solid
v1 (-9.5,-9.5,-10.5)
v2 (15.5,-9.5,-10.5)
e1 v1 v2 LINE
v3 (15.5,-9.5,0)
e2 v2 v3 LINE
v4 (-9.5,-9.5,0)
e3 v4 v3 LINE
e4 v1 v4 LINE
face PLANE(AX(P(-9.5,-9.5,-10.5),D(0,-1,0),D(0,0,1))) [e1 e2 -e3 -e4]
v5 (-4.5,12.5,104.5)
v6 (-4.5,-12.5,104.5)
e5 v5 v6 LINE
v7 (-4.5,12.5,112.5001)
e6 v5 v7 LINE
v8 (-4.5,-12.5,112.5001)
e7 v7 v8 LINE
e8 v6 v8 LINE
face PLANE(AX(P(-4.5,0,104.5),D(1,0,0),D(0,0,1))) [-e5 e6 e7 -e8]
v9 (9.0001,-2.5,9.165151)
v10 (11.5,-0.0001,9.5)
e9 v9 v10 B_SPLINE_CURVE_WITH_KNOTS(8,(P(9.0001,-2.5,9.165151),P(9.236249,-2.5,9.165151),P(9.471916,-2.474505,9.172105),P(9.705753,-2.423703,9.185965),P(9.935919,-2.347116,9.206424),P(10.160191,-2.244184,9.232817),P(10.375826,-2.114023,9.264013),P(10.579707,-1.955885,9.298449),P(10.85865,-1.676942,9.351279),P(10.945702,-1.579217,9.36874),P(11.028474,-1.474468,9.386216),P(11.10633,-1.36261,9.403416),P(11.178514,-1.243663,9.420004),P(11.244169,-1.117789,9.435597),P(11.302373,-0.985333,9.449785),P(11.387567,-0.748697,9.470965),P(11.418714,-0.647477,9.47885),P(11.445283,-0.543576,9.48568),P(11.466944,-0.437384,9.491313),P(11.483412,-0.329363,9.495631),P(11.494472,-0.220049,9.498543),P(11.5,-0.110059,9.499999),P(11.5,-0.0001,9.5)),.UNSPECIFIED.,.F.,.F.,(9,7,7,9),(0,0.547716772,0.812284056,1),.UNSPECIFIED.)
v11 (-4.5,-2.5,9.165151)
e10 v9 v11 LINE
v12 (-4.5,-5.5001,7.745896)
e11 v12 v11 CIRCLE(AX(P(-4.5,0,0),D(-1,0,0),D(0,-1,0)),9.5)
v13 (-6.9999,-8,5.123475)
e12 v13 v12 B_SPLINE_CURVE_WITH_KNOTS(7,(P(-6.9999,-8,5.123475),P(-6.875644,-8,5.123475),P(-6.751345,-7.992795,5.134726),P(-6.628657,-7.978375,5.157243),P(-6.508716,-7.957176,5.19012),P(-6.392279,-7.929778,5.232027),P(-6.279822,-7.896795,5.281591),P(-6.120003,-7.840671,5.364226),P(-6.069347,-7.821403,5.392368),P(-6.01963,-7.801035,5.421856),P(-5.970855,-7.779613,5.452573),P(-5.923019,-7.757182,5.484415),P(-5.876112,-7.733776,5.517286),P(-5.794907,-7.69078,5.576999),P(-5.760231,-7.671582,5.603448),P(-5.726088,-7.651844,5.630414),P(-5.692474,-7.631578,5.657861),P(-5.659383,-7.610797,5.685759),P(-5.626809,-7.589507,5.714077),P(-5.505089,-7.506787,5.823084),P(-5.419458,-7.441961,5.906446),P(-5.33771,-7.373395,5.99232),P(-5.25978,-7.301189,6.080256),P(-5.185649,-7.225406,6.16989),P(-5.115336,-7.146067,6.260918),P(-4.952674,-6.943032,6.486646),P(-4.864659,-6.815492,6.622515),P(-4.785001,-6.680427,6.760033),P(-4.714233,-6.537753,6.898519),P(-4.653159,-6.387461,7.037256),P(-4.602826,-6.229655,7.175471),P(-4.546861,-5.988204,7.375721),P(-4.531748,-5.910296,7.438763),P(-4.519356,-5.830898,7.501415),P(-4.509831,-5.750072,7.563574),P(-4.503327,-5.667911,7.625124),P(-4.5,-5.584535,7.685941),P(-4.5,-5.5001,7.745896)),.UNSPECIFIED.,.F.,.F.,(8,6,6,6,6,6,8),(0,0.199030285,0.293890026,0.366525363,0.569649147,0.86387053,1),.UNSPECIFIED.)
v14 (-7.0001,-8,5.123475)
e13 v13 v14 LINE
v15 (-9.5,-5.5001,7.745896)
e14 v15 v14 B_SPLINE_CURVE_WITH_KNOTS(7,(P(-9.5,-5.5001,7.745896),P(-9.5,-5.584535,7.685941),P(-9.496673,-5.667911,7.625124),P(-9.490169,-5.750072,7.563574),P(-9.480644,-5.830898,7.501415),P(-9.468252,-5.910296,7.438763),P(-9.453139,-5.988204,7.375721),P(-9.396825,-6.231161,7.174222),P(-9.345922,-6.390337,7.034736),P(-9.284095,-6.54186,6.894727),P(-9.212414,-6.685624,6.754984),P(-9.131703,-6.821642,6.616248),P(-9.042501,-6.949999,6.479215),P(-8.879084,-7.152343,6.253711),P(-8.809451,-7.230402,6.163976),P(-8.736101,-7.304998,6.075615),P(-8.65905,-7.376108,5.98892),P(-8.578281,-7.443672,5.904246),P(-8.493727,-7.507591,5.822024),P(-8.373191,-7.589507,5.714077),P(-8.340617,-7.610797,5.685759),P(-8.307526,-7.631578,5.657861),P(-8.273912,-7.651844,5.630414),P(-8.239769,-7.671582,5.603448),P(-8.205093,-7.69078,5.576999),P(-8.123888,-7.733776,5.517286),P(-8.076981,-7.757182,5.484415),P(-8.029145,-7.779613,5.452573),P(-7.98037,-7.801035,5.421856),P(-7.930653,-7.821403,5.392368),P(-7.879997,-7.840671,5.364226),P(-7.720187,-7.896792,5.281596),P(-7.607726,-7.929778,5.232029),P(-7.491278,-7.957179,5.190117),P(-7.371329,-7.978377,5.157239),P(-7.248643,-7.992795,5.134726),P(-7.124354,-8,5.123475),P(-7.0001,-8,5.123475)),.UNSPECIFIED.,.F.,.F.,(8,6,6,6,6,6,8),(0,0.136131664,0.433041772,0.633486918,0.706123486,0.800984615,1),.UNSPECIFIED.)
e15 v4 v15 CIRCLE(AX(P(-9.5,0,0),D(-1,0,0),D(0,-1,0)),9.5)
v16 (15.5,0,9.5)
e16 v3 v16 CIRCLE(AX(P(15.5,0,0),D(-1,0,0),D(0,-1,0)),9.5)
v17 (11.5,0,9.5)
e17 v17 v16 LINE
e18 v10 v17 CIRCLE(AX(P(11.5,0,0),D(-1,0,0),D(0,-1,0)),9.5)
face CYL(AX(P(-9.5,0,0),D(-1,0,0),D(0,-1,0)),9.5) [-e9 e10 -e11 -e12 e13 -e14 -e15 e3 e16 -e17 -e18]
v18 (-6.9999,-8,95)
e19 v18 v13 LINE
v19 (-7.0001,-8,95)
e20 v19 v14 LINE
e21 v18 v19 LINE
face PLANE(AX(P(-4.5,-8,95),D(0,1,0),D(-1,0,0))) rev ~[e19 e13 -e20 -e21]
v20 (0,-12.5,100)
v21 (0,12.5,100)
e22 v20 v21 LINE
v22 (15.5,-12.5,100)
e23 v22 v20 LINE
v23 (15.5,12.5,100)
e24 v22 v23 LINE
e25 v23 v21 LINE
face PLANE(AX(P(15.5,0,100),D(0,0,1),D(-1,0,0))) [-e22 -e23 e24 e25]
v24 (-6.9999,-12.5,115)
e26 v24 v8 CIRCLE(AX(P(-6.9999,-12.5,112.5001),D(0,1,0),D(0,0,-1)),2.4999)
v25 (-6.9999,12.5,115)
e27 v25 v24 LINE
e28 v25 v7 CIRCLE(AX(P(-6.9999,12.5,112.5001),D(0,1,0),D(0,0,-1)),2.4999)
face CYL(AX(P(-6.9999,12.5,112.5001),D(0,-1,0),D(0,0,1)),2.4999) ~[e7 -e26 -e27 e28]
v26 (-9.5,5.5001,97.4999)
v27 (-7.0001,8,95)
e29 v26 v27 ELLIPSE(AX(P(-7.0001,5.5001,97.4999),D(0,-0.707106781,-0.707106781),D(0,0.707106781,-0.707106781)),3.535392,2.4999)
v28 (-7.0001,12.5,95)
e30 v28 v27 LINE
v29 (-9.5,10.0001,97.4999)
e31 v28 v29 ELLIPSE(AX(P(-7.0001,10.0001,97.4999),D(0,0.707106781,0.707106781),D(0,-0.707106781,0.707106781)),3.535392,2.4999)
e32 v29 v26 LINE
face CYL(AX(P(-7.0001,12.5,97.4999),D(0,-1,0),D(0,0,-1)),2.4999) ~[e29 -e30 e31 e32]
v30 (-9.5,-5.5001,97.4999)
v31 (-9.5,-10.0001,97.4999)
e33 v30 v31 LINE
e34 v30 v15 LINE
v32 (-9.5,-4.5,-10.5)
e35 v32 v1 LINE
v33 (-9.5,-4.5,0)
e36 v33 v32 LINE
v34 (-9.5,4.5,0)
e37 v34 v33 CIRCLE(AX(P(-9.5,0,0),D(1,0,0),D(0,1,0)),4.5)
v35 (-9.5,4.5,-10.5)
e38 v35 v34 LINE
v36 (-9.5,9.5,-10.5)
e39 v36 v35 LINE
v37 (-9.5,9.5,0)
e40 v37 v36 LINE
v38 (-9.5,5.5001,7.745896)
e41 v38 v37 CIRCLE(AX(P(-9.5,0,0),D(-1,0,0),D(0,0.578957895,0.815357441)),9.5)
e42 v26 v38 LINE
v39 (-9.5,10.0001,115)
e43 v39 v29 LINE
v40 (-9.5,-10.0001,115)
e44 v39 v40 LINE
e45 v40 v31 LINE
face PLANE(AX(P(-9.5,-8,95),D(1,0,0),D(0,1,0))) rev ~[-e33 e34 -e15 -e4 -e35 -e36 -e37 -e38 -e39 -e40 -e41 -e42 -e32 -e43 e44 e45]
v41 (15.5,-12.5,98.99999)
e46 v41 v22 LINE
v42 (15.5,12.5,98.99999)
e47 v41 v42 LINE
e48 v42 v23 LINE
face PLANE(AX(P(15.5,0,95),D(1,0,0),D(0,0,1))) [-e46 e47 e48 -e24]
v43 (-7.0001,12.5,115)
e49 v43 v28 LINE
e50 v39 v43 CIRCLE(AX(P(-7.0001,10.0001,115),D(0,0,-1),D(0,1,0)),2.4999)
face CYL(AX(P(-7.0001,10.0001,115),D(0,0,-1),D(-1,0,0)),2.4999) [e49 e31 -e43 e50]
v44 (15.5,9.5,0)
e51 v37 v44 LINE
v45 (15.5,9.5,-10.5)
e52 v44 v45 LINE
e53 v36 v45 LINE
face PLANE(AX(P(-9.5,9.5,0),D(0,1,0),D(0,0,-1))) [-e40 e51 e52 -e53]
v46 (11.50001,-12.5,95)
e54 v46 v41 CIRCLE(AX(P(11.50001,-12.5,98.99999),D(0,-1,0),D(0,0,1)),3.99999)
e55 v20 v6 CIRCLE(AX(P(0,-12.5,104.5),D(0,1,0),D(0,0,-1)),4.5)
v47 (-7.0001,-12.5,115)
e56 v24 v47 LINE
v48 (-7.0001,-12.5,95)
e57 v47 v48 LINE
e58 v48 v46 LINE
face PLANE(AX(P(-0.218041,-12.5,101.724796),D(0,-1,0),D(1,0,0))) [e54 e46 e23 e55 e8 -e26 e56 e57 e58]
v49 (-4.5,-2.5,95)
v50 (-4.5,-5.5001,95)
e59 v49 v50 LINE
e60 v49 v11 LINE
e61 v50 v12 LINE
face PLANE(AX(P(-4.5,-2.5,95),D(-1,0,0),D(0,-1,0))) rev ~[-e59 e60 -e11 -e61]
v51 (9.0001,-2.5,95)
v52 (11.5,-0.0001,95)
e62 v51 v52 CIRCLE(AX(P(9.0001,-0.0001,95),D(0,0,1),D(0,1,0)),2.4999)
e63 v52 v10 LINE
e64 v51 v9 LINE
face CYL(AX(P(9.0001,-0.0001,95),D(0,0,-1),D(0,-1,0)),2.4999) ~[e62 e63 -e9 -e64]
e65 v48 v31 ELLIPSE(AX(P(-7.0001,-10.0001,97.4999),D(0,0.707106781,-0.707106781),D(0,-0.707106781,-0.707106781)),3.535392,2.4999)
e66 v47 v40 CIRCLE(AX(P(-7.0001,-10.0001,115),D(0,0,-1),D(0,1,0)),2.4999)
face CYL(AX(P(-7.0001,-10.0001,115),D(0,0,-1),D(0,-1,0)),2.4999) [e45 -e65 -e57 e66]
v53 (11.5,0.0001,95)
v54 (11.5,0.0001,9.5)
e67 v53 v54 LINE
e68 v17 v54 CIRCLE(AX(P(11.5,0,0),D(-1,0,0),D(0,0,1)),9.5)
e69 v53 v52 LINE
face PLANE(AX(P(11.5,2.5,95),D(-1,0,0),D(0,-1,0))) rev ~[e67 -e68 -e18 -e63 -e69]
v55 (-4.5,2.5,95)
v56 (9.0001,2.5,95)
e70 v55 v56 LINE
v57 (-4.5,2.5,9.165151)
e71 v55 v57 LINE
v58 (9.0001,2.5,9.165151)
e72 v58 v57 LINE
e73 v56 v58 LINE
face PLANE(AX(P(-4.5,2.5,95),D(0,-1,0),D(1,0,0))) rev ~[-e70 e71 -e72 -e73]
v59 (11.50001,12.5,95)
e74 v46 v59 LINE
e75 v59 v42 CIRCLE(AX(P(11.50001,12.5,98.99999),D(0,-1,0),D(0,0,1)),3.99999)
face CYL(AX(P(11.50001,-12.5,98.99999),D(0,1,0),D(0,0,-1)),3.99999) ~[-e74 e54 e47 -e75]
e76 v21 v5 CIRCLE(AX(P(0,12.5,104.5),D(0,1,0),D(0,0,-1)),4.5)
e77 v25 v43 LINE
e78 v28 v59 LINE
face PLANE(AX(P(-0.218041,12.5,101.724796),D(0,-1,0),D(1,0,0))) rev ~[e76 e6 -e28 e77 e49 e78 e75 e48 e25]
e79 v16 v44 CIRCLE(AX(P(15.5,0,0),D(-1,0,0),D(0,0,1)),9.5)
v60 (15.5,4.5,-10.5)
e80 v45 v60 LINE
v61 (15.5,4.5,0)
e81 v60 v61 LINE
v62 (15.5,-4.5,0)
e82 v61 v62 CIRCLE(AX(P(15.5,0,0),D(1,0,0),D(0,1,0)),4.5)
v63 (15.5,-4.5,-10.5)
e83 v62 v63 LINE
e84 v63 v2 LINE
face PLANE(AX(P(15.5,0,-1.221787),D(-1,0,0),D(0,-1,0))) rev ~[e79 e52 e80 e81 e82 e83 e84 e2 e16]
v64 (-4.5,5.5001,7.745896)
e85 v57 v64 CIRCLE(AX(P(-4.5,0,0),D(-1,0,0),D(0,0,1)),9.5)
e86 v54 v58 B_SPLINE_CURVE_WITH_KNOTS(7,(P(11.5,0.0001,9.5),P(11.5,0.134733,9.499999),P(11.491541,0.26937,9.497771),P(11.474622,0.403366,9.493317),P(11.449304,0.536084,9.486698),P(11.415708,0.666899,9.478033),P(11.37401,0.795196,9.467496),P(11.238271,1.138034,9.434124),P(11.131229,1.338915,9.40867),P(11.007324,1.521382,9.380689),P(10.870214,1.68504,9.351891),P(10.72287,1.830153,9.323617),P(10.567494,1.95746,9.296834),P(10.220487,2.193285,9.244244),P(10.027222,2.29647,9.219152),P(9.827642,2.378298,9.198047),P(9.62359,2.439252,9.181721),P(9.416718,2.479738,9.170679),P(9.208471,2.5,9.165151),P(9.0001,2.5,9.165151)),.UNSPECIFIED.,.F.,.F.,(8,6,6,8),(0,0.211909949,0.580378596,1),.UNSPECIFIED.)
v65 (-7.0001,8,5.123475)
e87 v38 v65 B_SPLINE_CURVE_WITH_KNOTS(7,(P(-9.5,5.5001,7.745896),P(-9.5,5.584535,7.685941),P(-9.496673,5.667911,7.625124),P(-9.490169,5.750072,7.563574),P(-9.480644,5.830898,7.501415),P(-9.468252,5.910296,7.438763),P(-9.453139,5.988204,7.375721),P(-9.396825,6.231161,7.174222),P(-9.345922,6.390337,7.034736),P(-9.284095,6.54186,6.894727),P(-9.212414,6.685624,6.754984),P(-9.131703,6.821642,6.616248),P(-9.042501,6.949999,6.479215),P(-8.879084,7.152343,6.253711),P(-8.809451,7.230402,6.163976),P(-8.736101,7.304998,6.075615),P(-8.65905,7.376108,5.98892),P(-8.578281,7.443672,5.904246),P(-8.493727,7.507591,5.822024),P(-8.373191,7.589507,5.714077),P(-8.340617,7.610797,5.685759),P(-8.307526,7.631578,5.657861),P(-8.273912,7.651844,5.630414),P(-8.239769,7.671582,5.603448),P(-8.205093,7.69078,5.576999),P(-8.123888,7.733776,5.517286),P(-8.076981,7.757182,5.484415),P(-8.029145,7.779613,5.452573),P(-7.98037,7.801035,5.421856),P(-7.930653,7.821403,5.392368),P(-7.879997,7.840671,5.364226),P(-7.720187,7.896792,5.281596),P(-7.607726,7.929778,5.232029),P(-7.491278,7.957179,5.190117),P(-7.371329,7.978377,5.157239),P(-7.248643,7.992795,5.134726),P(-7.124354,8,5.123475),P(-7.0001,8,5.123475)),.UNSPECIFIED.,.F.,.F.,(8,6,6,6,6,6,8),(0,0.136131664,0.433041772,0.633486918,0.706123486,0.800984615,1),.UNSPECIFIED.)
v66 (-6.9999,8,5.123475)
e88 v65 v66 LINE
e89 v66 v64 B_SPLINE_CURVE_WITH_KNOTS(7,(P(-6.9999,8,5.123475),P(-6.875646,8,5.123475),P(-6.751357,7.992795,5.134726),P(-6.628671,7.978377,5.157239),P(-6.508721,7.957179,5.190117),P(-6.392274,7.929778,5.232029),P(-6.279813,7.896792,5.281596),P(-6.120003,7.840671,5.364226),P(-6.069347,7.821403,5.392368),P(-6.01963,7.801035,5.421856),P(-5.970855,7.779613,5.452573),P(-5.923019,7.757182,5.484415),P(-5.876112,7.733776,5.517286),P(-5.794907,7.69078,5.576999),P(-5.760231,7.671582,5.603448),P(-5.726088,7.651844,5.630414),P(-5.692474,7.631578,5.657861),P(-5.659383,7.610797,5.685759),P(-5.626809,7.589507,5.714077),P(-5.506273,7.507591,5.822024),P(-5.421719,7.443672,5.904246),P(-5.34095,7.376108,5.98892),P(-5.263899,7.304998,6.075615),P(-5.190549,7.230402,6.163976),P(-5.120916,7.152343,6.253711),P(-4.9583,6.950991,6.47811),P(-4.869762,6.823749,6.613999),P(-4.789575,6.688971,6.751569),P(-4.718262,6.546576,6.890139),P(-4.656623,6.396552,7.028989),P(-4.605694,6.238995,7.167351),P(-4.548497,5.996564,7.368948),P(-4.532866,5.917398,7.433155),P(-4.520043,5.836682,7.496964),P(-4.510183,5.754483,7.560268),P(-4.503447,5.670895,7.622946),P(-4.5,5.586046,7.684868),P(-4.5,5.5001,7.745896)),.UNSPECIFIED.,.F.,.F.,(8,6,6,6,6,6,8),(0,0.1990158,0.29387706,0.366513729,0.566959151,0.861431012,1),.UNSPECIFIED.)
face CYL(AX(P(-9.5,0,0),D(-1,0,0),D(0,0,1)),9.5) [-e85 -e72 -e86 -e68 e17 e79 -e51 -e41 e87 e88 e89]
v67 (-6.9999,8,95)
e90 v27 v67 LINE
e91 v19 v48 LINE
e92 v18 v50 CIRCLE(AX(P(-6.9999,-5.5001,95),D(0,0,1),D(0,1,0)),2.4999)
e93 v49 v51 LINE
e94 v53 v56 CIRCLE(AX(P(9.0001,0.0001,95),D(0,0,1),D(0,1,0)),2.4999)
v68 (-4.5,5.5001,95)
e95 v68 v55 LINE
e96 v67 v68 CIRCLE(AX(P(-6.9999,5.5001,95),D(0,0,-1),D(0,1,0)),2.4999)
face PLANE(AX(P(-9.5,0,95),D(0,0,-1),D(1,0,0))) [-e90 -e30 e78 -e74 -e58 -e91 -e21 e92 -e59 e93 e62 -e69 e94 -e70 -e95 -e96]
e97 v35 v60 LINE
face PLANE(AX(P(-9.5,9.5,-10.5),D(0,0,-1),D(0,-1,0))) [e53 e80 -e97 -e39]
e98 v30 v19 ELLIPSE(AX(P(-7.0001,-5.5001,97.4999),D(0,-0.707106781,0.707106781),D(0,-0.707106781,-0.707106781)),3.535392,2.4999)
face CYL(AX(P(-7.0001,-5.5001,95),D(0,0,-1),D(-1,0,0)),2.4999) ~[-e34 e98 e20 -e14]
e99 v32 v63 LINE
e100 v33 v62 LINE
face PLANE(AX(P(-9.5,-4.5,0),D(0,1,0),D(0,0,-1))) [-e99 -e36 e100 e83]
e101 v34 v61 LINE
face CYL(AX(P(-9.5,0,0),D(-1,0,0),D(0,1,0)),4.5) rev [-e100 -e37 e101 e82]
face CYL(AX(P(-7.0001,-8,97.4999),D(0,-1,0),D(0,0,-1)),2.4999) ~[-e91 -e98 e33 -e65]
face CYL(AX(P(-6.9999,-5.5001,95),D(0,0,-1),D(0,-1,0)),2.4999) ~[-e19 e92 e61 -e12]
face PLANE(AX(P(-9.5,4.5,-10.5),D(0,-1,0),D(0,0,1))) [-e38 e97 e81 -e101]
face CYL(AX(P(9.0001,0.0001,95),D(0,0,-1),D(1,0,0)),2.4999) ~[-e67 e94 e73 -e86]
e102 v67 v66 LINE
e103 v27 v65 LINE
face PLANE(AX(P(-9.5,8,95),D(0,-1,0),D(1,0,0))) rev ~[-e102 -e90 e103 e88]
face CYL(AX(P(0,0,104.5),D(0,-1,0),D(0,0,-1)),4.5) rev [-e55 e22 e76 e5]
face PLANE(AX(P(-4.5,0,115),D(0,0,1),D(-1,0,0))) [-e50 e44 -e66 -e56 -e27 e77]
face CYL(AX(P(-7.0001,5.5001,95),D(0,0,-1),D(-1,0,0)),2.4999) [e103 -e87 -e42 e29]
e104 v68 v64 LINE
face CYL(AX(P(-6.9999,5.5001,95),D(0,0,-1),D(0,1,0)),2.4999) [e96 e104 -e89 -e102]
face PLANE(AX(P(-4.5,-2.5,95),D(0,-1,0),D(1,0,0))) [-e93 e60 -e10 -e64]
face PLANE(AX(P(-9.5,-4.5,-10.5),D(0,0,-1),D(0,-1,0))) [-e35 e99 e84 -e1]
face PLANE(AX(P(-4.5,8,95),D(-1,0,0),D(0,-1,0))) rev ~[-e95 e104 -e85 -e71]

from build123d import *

# Parameters (mm, degrees)
F1_DEPTH = 12.5
F3_DEPTH = 25
F4_W     = 16
F4_H     = 5
F5_DEPTH = 89.876524617
F6_R     = 3.99999
F7_R     = 2.4999


# Not quite as in the source:
# - a fillet or chamfer is up to 0.001 mm smaller than in the source, because OpenCascade refuses the exact size


with BuildPart() as f1:
    # F0 (on Front) → F1 (new body, symmetric)
    with BuildSketch(Plane.XZ):
        with BuildLine():
            ThreePointArc((0, 100), (-3.1819805153, 101.3180194847), (-4.5, 104.5))
            Line((-4.5, 104.5), (-4.5, 115))
            Line((-4.5, 115), (-9.5, 115))
            Line((-9.5, 115), (-9.5, 95))
            Line((-9.5, 95), (15.5, 95))
            Line((15.5, 95), (15.5, 100))
            Line((15.5, 100), (0, 100))
        make_face()
    extrude(amount=F1_DEPTH, both=True)



with BuildPart() as f3:
    # F2 (on face) → F3 (new body)
    with BuildSketch(Plane(origin=(-9.5, 0, 0), x_dir=(0, -1, 0), z_dir=(-1, 0, 0))):
        with BuildLine():
            ThreePointArc((-4.5, 0), (0, 4.5), (4.5, 0))
            Line((4.5, 0), (4.5, -10.5))
            Line((4.5, -10.5), (9.5, -10.5))
            Line((9.5, -10.5), (9.5, 0))
            ThreePointArc((9.5, 0), (6.7175144213, 6.7175144213), (0, 9.5))
            ThreePointArc((0, 9.5), (-6.7175144213, 6.7175144213), (-9.5, 0))
            Line((-9.5, 0), (-9.5, -10.5))
            Line((-9.5, -10.5), (-4.5, -10.5))
            Line((-4.5, -10.5), (-4.5, 0))
        make_face()
    extrude(amount=-F3_DEPTH)


with BuildPart() as f1_1:
    add(f1.part)

    add(f3.part)  # F5 merges F3
    # F4 (on face) → F5 (join, through all)
    with BuildSketch(Plane(origin=(0, 0, 95), x_dir=(1, 0, 0), z_dir=(0, 0, -1))):
        Polygon((-4.5, 8), (-9.5, 8), (-9.5, -8), (-4.5, -8), (-4.5, -2.5), (-4.5, 2.5), align=None)
        with Locations((3.5, 0)):
            Rectangle(F4_W, F4_H)
    extrude(amount=F5_DEPTH)

    # F6 (radius 4 in the source; OpenCascade refuses exactly that, so slightly less here)
    f6_edges = [f1_1.edges().sort_by_distance(p)[0] for p in [
        (15.5, 0, 95),
    ]]
    fillet(f6_edges, radius=F6_R)

    # F7 (radius 2.5 in the source; OpenCascade refuses exactly that, so slightly less here)
    f7_edges = [f1_1.edges().sort_by_distance(p)[0] for p in [
        (11.5, -2.5, 52.082576),
        (11.5, 2.5, 52.082576),
        (-4.5, -8, 50.061738),
        (-4.5, 8, 50.061738),
        (-9.5, 8, 50.061738),
        (-9.5, -8, 50.061738),
        (-9.5, -10.25, 95),
        (-9.5, 10.25, 95),
        (-9.5, -12.5, 105),
        (-9.5, 12.5, 105),
        (-4.5, 0, 115),
    ]]
    fillet(f7_edges, radius=F7_R)


solid = f1_1.part
